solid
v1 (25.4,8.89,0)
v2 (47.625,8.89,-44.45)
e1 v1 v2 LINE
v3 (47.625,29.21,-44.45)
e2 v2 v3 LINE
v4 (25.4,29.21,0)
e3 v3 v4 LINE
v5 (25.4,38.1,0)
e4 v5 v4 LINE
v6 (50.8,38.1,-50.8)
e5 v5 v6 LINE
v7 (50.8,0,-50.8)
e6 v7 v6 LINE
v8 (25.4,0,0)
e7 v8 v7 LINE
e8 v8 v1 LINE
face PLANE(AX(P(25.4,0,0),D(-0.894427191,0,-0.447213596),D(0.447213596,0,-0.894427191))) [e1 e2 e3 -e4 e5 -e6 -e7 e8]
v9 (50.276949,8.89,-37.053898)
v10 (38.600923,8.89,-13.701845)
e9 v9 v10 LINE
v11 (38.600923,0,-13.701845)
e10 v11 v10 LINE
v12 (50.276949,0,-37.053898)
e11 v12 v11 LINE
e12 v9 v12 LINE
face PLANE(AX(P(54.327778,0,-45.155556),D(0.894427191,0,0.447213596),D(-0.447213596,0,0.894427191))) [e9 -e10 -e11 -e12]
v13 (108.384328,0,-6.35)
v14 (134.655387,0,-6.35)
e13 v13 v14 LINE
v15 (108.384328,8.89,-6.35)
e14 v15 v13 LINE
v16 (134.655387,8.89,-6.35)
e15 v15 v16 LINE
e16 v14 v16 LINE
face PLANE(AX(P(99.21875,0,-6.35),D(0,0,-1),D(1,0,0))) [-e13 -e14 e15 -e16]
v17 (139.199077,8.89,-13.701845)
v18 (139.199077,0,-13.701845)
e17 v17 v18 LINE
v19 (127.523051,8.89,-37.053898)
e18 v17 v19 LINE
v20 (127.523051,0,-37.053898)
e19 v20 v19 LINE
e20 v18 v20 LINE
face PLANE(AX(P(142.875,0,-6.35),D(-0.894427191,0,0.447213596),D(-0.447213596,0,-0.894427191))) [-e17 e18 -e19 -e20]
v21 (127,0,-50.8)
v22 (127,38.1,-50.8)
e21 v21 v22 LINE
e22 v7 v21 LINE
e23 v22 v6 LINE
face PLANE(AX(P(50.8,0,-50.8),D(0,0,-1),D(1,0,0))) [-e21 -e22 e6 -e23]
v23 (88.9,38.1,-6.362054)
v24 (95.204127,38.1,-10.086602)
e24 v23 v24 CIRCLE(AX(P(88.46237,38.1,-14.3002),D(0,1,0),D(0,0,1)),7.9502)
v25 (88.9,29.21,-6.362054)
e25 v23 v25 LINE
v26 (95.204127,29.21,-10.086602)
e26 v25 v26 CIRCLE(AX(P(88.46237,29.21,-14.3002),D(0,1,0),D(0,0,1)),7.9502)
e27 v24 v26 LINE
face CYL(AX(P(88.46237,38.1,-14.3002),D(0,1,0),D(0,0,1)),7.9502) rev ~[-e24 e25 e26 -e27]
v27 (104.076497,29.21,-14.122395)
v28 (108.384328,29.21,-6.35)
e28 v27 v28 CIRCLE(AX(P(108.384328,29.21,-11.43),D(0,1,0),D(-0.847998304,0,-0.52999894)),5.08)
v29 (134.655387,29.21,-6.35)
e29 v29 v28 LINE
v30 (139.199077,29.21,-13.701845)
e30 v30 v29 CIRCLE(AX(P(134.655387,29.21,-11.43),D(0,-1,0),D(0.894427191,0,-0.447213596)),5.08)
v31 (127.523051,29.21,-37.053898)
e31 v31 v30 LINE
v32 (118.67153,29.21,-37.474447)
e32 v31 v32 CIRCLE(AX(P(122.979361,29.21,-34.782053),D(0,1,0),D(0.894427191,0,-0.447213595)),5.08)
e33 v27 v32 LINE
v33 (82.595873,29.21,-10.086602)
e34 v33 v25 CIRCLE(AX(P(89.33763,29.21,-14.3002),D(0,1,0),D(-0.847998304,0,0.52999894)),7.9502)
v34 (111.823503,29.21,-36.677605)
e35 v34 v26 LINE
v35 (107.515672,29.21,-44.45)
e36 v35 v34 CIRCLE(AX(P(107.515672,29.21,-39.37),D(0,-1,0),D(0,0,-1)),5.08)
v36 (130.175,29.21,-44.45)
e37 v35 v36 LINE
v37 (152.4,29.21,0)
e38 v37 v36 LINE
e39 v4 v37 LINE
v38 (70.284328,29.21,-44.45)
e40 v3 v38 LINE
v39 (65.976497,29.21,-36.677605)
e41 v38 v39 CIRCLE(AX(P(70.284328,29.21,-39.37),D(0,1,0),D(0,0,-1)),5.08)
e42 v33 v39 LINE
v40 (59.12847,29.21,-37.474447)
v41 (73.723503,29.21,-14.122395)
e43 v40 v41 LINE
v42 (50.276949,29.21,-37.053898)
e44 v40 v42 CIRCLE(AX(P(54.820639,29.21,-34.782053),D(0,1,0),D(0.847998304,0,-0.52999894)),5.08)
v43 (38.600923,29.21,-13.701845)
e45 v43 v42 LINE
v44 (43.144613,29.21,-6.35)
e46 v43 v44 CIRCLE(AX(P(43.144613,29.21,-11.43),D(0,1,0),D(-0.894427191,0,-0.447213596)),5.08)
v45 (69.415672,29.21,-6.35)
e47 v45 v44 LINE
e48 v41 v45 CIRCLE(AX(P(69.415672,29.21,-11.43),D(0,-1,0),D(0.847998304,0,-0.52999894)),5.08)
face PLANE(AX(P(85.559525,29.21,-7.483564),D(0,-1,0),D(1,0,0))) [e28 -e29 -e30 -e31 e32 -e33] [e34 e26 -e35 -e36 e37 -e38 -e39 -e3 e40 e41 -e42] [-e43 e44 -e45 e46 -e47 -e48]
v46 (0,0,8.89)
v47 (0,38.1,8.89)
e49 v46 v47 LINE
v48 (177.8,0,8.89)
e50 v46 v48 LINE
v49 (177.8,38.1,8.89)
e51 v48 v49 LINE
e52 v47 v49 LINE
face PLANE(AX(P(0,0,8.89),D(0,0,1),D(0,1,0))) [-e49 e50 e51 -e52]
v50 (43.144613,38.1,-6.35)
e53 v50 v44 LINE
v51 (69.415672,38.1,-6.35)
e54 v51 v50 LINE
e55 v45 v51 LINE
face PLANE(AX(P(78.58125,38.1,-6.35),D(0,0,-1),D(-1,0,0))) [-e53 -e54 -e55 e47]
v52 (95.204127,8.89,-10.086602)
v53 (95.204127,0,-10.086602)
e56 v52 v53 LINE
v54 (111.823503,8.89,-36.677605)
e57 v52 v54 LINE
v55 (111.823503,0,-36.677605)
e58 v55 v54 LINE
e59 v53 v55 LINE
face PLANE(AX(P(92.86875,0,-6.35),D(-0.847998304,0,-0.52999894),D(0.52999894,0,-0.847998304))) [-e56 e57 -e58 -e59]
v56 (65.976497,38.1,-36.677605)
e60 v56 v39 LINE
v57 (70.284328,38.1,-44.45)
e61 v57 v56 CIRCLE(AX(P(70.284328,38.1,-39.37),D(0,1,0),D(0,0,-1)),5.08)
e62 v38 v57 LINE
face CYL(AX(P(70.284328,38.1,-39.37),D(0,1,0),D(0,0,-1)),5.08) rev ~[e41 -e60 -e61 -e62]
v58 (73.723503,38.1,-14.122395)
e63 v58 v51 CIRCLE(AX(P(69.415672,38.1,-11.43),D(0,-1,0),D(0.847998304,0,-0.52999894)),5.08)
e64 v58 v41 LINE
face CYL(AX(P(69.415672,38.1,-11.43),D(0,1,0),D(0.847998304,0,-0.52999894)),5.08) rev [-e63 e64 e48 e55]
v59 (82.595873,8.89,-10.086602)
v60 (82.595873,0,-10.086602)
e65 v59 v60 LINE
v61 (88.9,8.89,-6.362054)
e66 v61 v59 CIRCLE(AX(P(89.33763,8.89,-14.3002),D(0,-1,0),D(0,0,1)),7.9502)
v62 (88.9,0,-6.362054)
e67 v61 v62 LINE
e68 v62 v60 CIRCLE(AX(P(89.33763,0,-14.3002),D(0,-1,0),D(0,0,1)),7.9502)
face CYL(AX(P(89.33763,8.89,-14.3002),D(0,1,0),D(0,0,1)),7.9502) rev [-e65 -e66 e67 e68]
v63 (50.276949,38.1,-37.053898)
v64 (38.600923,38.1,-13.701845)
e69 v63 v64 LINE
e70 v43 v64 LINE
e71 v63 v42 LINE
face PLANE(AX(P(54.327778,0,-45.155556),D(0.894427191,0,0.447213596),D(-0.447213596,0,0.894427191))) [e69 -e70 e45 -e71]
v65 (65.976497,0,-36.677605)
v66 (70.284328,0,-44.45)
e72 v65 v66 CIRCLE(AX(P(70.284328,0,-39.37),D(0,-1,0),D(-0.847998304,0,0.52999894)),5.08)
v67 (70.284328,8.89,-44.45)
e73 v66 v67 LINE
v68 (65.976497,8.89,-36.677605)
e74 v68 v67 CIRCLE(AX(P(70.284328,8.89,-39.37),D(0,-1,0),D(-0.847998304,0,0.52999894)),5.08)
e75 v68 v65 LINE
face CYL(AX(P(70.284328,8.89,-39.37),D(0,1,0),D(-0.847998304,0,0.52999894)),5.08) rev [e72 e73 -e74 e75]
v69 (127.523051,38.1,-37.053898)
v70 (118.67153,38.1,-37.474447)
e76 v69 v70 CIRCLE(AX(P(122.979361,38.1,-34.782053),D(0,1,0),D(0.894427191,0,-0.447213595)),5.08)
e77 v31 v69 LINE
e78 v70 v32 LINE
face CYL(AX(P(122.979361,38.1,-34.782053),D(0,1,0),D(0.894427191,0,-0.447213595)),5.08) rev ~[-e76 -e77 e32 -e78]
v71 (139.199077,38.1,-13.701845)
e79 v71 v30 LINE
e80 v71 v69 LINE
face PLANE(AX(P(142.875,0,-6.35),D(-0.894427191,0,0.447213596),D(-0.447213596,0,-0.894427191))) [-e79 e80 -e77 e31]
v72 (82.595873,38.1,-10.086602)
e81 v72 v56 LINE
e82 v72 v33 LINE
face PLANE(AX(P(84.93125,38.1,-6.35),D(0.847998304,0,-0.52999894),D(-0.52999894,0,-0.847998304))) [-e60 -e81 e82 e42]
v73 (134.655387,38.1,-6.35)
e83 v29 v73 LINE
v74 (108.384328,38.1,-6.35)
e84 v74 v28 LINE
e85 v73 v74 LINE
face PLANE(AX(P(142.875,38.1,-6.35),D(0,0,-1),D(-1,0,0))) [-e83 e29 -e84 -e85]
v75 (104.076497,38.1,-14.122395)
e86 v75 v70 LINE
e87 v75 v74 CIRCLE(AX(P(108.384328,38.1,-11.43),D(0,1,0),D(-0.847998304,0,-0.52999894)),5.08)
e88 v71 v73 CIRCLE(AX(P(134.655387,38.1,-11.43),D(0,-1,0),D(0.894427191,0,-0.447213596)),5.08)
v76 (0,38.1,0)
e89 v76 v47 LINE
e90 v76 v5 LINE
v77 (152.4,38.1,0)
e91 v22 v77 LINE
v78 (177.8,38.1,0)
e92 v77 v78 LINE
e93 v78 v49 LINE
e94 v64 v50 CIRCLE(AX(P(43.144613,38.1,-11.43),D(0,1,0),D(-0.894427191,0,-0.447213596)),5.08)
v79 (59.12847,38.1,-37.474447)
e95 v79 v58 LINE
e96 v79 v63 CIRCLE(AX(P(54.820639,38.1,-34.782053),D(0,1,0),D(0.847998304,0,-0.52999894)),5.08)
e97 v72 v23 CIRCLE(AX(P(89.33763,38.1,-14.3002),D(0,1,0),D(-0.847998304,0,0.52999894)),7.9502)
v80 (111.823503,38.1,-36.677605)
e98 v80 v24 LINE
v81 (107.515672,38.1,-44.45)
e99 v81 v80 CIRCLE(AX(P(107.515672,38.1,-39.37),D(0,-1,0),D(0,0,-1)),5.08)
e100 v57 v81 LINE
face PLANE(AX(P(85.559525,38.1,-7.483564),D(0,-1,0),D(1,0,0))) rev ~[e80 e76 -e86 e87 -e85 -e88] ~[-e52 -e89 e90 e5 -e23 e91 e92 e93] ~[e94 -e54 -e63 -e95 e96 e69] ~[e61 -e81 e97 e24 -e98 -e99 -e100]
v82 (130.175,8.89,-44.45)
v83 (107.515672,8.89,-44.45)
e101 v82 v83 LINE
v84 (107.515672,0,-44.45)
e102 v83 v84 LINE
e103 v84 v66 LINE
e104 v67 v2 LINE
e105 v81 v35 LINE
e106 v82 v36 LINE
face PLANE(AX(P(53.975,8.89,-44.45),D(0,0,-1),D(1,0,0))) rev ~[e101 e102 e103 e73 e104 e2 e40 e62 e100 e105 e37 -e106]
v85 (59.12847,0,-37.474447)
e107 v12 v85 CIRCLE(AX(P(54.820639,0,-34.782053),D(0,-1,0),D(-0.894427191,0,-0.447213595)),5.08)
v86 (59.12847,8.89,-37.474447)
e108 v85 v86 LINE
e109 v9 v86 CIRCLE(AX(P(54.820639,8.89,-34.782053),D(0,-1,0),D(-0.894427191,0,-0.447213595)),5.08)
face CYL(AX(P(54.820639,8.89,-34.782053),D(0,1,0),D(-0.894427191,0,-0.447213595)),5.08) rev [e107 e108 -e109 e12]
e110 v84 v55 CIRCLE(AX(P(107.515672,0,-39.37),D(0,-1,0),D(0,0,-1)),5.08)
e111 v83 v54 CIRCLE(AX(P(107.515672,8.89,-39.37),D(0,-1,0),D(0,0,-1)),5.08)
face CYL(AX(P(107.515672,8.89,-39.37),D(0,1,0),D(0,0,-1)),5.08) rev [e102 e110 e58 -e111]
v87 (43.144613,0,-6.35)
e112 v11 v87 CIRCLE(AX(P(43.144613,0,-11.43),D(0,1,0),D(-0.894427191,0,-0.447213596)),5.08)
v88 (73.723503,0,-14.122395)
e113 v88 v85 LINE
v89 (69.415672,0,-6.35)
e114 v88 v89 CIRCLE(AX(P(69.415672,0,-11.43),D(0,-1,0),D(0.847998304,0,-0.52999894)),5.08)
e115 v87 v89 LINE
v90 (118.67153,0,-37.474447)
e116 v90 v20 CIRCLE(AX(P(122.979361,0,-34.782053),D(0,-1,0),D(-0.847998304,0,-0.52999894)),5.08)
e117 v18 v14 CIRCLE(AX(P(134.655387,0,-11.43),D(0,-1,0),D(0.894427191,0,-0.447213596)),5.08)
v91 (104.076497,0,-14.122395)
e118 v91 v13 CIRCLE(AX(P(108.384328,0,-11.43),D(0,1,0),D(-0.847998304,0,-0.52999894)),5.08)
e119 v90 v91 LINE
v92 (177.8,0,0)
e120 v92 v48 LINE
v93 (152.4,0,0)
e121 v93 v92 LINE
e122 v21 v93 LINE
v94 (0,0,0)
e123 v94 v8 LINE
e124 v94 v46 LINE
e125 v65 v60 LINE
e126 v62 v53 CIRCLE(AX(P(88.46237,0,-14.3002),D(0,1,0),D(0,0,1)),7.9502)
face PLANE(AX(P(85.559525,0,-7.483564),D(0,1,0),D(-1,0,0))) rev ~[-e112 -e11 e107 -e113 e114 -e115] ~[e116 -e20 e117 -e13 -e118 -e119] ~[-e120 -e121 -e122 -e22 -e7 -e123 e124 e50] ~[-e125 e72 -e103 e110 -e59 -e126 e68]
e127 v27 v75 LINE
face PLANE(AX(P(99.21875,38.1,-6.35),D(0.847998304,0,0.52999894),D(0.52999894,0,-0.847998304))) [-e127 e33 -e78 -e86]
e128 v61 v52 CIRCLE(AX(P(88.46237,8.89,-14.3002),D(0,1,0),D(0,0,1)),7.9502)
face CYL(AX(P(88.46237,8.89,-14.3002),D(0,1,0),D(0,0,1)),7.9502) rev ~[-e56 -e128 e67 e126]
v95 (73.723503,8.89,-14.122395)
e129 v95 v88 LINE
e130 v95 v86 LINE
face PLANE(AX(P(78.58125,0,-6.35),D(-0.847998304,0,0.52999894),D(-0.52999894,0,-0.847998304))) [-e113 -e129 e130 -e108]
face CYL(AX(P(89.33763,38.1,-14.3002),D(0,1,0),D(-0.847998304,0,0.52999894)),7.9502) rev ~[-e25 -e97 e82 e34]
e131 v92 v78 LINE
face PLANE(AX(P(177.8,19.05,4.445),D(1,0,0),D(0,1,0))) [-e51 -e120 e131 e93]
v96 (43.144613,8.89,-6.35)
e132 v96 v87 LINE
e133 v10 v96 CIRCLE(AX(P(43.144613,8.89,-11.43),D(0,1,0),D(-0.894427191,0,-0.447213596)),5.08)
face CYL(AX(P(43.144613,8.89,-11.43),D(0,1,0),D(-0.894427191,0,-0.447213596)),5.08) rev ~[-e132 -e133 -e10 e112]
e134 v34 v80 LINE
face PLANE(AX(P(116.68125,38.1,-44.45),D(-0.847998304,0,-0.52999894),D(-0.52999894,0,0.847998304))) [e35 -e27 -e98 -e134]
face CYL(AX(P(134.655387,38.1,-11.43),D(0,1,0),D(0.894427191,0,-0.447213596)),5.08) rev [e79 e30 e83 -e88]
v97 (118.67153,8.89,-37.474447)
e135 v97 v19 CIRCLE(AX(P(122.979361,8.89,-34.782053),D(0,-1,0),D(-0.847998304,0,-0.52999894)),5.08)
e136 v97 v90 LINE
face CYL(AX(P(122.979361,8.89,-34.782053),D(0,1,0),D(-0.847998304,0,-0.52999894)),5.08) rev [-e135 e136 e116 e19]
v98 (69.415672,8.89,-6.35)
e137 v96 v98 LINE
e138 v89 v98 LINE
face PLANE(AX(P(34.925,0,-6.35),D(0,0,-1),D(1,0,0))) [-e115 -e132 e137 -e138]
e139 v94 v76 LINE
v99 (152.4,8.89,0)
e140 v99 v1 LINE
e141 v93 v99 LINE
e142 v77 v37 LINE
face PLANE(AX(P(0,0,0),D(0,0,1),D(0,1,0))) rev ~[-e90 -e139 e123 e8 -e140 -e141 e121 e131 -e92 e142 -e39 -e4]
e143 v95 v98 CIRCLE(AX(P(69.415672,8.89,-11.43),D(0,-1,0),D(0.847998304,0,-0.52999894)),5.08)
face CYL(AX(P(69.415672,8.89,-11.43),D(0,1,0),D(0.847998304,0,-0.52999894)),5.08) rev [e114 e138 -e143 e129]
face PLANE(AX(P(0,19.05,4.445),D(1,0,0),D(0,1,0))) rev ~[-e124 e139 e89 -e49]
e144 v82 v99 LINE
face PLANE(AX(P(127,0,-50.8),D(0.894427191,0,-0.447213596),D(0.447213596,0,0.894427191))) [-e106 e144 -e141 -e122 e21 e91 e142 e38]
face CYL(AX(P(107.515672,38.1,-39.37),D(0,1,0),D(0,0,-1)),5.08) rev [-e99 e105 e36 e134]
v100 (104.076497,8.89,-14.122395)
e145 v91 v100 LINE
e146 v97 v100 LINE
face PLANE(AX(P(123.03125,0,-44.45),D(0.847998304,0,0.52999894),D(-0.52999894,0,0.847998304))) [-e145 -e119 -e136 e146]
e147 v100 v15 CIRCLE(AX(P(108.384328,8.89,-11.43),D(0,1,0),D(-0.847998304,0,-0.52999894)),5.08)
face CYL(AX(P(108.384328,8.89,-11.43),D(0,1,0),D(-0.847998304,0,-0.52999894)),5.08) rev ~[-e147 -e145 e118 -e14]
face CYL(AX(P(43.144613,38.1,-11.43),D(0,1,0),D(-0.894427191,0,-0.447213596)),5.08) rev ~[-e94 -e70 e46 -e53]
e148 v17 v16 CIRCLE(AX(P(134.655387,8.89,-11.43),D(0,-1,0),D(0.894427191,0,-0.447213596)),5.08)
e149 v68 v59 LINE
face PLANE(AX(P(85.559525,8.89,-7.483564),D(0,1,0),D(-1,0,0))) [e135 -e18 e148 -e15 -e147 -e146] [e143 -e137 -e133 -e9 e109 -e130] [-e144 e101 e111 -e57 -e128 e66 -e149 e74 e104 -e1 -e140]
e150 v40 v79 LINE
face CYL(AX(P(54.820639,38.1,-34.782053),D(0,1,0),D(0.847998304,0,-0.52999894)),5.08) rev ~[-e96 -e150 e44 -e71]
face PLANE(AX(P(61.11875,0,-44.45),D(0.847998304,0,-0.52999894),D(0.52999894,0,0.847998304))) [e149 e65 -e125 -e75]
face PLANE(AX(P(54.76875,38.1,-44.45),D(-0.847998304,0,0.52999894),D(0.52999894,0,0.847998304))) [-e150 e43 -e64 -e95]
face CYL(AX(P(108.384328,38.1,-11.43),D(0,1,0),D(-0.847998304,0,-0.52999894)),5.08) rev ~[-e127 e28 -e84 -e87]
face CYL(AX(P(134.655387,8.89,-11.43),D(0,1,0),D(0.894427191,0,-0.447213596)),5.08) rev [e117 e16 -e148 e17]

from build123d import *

# Parameters (mm, degrees)
F0_W          = 38.1
F0_H          = 8.89
F1_DEPTH      = 177.8
F3_DEPTH      = 8.89
F5_DEPTH      = 8.89
F7_DEPTH      = 38.1
F10_DEPTH     = 20.32
F12_DEPTH     = 20.32
F13_T1_DEPTH  = 8.89
F13_T3_DEPTH  = 8.89
F13_T8_DEPTH  = 31.5348218608
F13_T13_DEPTH = 31.5348218608
F13_T18_DEPTH = 31.5348218608
F13_T23_DEPTH = 31.8039450471
F13_T28_DEPTH = 29.4390316571
F13_T33_DEPTH = 31.5348218608
F13_T38_DEPTH = 29.4390316571
F13_T43_DEPTH = 31.8039450471
F13_T48_DEPTH = 31.8039450471
F13_T53_DEPTH = 29.4390316571
F13_T58_DEPTH = 31.8039450471
F13_T63_DEPTH = 29.4390316571
F13_T68_DEPTH = 31.8039450471
F13_T73_DEPTH = 31.8039450471
F13_T78_DEPTH = 31.8039450471
F13_T83_DEPTH = 31.8039450471
F14_T1_DEPTH  = 8.89
F14_T3_DEPTH  = 8.89


# Not quite as in the source:
# - a fillet or chamfer that OpenCascade refuses, or shapes differently, is made with other operations: its cross-section is extruded or revolved along the edge and cut away or added


with BuildPart() as f1:
    # F0 (on Right) → F1 (new body)
    with BuildSketch(Plane.YZ):
        with Locations((19.05, 4.445)):
            Rectangle(F0_W, F0_H)
    extrude(amount=F1_DEPTH)

    # F2 (on face) → F3 (join)
    with BuildSketch(Plane.XZ):
        Polygon((82.55, 0), (31.75, 0), (34.925, -6.35), (78.58125, -6.35), align=None)
        Polygon((88.9, 0), (82.55, 0), (78.58125, -6.35), (84.93125, -6.35), align=None)
        Polygon((92.86875, -6.35), (88.9, 0), (84.93125, -6.35), align=None)
        Polygon((95.25, 0), (88.9, 0), (92.86875, -6.35), (99.21875, -6.35), align=None)
        Polygon((146.05, 0), (95.25, 0), (99.21875, -6.35), (142.875, -6.35), align=None)
        Polygon((149.225, -6.35), (152.4, 0), (146.05, 0), (142.875, -6.35), align=None)
        Polygon((130.175, -44.45), (149.225, -6.35), (142.875, -6.35), (123.825, -44.45), align=None)
        Polygon((127, -50.8), (130.175, -44.45), (123.825, -44.45), (123.4722222222, -45.1555555556), align=None)
        Polygon((123.4722222222, -45.1555555556), (120.65, -50.8), (127, -50.8), align=None)
        Polygon((123.03125, -44.45), (116.68125, -44.45), (120.65, -50.8), (123.4722222222, -45.1555555556), align=None)
        Polygon((99.21875, -6.35), (92.86875, -6.35), (116.68125, -44.45), (123.03125, -44.45), align=None)
        Polygon((61.11875, -44.45), (57.15, -50.8), (88.9, -50.8), (120.65, -50.8), (116.68125, -44.45), align=None)
        Polygon((84.93125, -6.35), (78.58125, -6.35), (54.76875, -44.45), (61.11875, -44.45), align=None)
        Polygon((54.3277777778, -45.1555555556), (57.15, -50.8), (61.11875, -44.45), (54.76875, -44.45), align=None)
        Polygon((54.3277777778, -45.1555555556), (50.8, -50.8), (57.15, -50.8), align=None)
        Polygon((34.925, -6.35), (28.575, -6.35), (47.625, -44.45), (53.975, -44.45), align=None)
        Polygon((31.75, 0), (25.4, 0), (28.575, -6.35), (34.925, -6.35), align=None)
        Polygon((53.975, -44.45), (47.625, -44.45), (50.8, -50.8), (54.3277777778, -45.1555555556), align=None)
    extrude(amount=-F3_DEPTH)

    # F4 (on face) → F5 (join)
    with BuildSketch(Plane(origin=(0, 38.1, 0), x_dir=(-1, 0, 0), z_dir=(0, 1, 0))):
        Polygon((-95.25, 0), (-146.05, 0), (-142.875, -6.35), (-99.21875, -6.35), align=None)
        Polygon((-146.05, 0), (-152.4, 0), (-149.225, -6.35), (-142.875, -6.35), align=None)
        Polygon((-88.9, 0), (-95.25, 0), (-99.21875, -6.35), (-92.86875, -6.35), align=None)
        Polygon((-84.93125, -6.35), (-88.9, 0), (-92.86875, -6.35), align=None)
        Polygon((-82.55, 0), (-88.9, 0), (-84.93125, -6.35), (-78.58125, -6.35), align=None)
        Polygon((-31.75, 0), (-82.55, 0), (-78.58125, -6.35), (-34.925, -6.35), align=None)
        Polygon((-25.4, 0), (-31.75, 0), (-34.925, -6.35), (-28.575, -6.35), align=None)
        Polygon((-28.575, -6.35), (-34.925, -6.35), (-53.975, -44.45), (-47.625, -44.45), align=None)
        Polygon((-54.3277777778, -45.1555555556), (-50.8, -50.8), (-47.625, -44.45), (-53.975, -44.45), align=None)
        Polygon((-54.3277777778, -45.1555555556), (-57.15, -50.8), (-50.8, -50.8), align=None)
        Polygon((-61.11875, -44.45), (-57.15, -50.8), (-54.3277777778, -45.1555555556), (-54.76875, -44.45), align=None)
        Polygon((-78.58125, -6.35), (-84.93125, -6.35), (-61.11875, -44.45), (-54.76875, -44.45), align=None)
        Polygon((-116.68125, -44.45), (-120.65, -50.8), (-57.15, -50.8), (-61.11875, -44.45), align=None)
        Polygon((-92.86875, -6.35), (-99.21875, -6.35), (-123.03125, -44.45), (-116.68125, -44.45), align=None)
        Polygon((-123.4722222222, -45.1555555556), (-120.65, -50.8), (-116.68125, -44.45), (-123.03125, -44.45), align=None)
        Polygon((-123.4722222222, -45.1555555556), (-127, -50.8), (-120.65, -50.8), align=None)
        Polygon((-123.825, -44.45), (-130.175, -44.45), (-127, -50.8), (-123.4722222222, -45.1555555556), align=None)
        Polygon((-142.875, -6.35), (-149.225, -6.35), (-130.175, -44.45), (-123.825, -44.45), align=None)
    extrude(amount=-F5_DEPTH)

    # F6 (on face) → F7 (join)
    with BuildSketch(Plane.XZ):
        Polygon((53.975, -44.45), (47.625, -44.45), (50.8, -50.8), (127, -50.8), (130.175, -44.45), (123.825, -44.45), (123.4722222222, -45.1555555556), (123.03125, -44.45), (116.68125, -44.45), (61.11875, -44.45), (54.76875, -44.45), (54.3277777778, -45.1555555556), align=None)
    extrude(amount=-F7_DEPTH)

    # F9 (on offset) → F10 (join)
    with BuildSketch(Plane(origin=(0, 8.89, 0), x_dir=(-1, 0, 0), z_dir=(0, 1, 0))):
        Polygon((-123.825, -44.45), (-123.4722222222, -45.1555555556), (-123.03125, -44.45), align=None)
    extrude(amount=F10_DEPTH)

    # F11 (on offset) → F12 (join)
    with BuildSketch(Plane(origin=(0, 8.89, 0), x_dir=(-1, 0, 0), z_dir=(0, 1, 0))):
        Polygon((-54.76875, -44.45), (-54.3277777778, -45.1555555556), (-53.975, -44.45), align=None)
    extrude(amount=F12_DEPTH)

    # F13: fillet of radius 5.08 on 16 edges, made by hand

    # F13_s2 → F13_t1 (join)
    with BuildSketch(Plane.XZ.offset(-8.89)):
        with BuildLine():
            ThreePointArc((50.2769488963, -37.0538977925), (54.5795522828, -39.8563287528), (59.1284704109, -37.4744473426))
            Line((59.1284704109, -37.4744473426), (54.3277777778, -45.1555555556))
            Line((54.3277777778, -45.1555555556), (50.2769488963, -37.0538977925))
        make_face()
        with BuildLine():
            ThreePointArc((118.6715295891, -37.4744473426), (123.2204477172, -39.8563287528), (127.5230511037, -37.0538977925))
            Line((127.5230511037, -37.0538977925), (123.4722222222, -45.1555555556))
            Line((123.4722222222, -45.1555555556), (118.6715295891, -37.4744473426))
        make_face()
        with BuildLine():
            ThreePointArc((73.7235033655, -14.1223946152), (73.8588557859, -8.9673758554), (69.4156719811, -6.35))
            Line((69.4156719811, -6.35), (78.58125, -6.35))
            Line((78.58125, -6.35), (73.7235033655, -14.1223946152))
        make_face()
        with BuildLine():
            ThreePointArc((38.6009225326, -13.7018450651), (38.8233065564, -8.7592859504), (43.1446126628, -6.35))
            Line((43.1446126628, -6.35), (34.925, -6.35))
            Line((34.925, -6.35), (38.6009225326, -13.7018450651))
        make_face()
        with BuildLine():
            ThreePointArc((104.0764966345, -14.1223946152), (103.9411442141, -8.9673758554), (108.3843280189, -6.35))
            Line((108.3843280189, -6.35), (99.21875, -6.35))
            Line((99.21875, -6.35), (104.0764966345, -14.1223946152))
        make_face()
        with BuildLine():
            ThreePointArc((139.1990774674, -13.7018450651), (138.9766934436, -8.7592859504), (134.6553873372, -6.35))
            Line((134.6553873372, -6.35), (142.875, -6.35))
            Line((142.875, -6.35), (139.1990774674, -13.7018450651))
        make_face()
        with BuildLine():
            ThreePointArc((65.9764966345, -36.6776053848), (65.8411442141, -41.8326241446), (70.2843280189, -44.45))
            Line((70.2843280189, -44.45), (61.11875, -44.45))
            Line((61.11875, -44.45), (65.9764966345, -36.6776053848))
        make_face()
        with BuildLine():
            ThreePointArc((107.5156719811, -44.45), (111.9588557859, -41.8326241446), (111.8235033655, -36.6776053848))
            Line((111.8235033655, -36.6776053848), (116.68125, -44.45))
            Line((116.68125, -44.45), (107.5156719811, -44.45))
        make_face()
    extrude(amount=F13_T1_DEPTH)

    # F13_s4 → F13_t3 (join)
    with BuildSketch(Plane.XZ.offset(-38.1)):
        with BuildLine():
            ThreePointArc((127.5230511037, -37.0538977925), (123.2204477172, -39.8563287528), (118.6715295891, -37.4744473426))
            Line((118.6715295891, -37.4744473426), (123.4722222222, -45.1555555556))
            Line((123.4722222222, -45.1555555556), (127.5230511037, -37.0538977925))
        make_face()
        with BuildLine():
            ThreePointArc((104.0764966345, -14.1223946152), (103.9411442141, -8.9673758554), (108.3843280189, -6.35))
            Line((108.3843280189, -6.35), (99.21875, -6.35))
            Line((99.21875, -6.35), (104.0764966345, -14.1223946152))
        make_face()
        with BuildLine():
            ThreePointArc((38.6009225326, -13.7018450651), (38.8233065564, -8.7592859504), (43.1446126628, -6.35))
            Line((43.1446126628, -6.35), (34.925, -6.35))
            Line((34.925, -6.35), (38.6009225326, -13.7018450651))
        make_face()
        with BuildLine():
            ThreePointArc((59.1284704109, -37.4744473426), (54.5795522828, -39.8563287528), (50.2769488963, -37.0538977925))
            Line((50.2769488963, -37.0538977925), (54.3277777778, -45.1555555556))
            Line((54.3277777778, -45.1555555556), (59.1284704109, -37.4744473426))
        make_face()
        with BuildLine():
            ThreePointArc((139.1990774674, -13.7018450651), (138.9766934436, -8.7592859504), (134.6553873372, -6.35))
            Line((134.6553873372, -6.35), (142.875, -6.35))
            Line((142.875, -6.35), (139.1990774674, -13.7018450651))
        make_face()
        with BuildLine():
            ThreePointArc((73.7235033655, -14.1223946152), (73.8588557859, -8.9673758554), (69.4156719811, -6.35))
            Line((69.4156719811, -6.35), (78.58125, -6.35))
            Line((78.58125, -6.35), (73.7235033655, -14.1223946152))
        make_face()
        with BuildLine():
            ThreePointArc((107.5156719811, -44.45), (111.9588557859, -41.8326241446), (111.8235033655, -36.6776053848))
            Line((111.8235033655, -36.6776053848), (116.68125, -44.45))
            Line((116.68125, -44.45), (107.5156719811, -44.45))
        make_face()
        with BuildLine():
            ThreePointArc((70.2843280189, -44.45), (65.8411442141, -41.8326241446), (65.9764966345, -36.6776053848))
            Line((65.9764966345, -36.6776053848), (61.11875, -44.45))
            Line((61.11875, -44.45), (70.2843280189, -44.45))
        make_face()
    extrude(amount=F13_T3_DEPTH)


with BuildPart() as f13_tool6:
    # F13_s7 → F13_t8 (new body)
    with BuildSketch(Plane.XZ):
        with BuildLine():
            ThreePointArc((50.2769488963, -37.0538977925), (54.5795522828, -39.8563287528), (59.1284704109, -37.4744473426))
            Line((59.1284704109, -37.4744473426), (54.3277777778, -45.1555555556))
            Line((54.3277777778, -45.1555555556), (50.2769488963, -37.0538977925))
        make_face()
    extrude(amount=-F13_T8_DEPTH)

    split(bisect_by=Plane.XZ.offset(-29.21), keep=Keep.BOTTOM)


with BuildPart() as f1_1:
    add(f1.part)

    # F13_t5: union F13_tool6
    add(f13_tool6.part)


with BuildPart() as f13_tool11:
    # F13_s12 → F13_t13 (new body)
    with BuildSketch(Plane.XZ):
        with BuildLine():
            ThreePointArc((118.6715295891, -37.4744473426), (123.2204477172, -39.8563287528), (127.5230511037, -37.0538977925))
            Line((127.5230511037, -37.0538977925), (123.4722222222, -45.1555555556))
            Line((123.4722222222, -45.1555555556), (118.6715295891, -37.4744473426))
        make_face()
    extrude(amount=-F13_T13_DEPTH)

    split(bisect_by=Plane.XZ.offset(-29.21), keep=Keep.BOTTOM)


with BuildPart() as f1_2:
    add(f1_1.part)

    # F13_t10: union F13_tool11
    add(f13_tool11.part)


with BuildPart() as f13_tool16:
    # F13_s17 → F13_t18 (new body)
    with BuildSketch(Plane.XZ.offset(-6.5651781392)):
        with BuildLine():
            ThreePointArc((127.5230511037, -37.0538977925), (123.2204477172, -39.8563287528), (118.6715295891, -37.4744473426))
            Line((118.6715295891, -37.4744473426), (123.4722222222, -45.1555555556))
            Line((123.4722222222, -45.1555555556), (127.5230511037, -37.0538977925))
        make_face()
    extrude(amount=-F13_T18_DEPTH)

    split(bisect_by=Plane.XZ.offset(-8.89), keep=Keep.TOP)


with BuildPart() as f1_3:
    add(f1_2.part)

    # F13_t15: union F13_tool16
    add(f13_tool16.part)


with BuildPart() as f13_tool21:
    # F13_s22 → F13_t23 (new body)
    with BuildSketch(Plane.XZ.offset(-38.1)):
        with BuildLine():
            ThreePointArc((104.0764966345, -14.1223946152), (103.9411442141, -8.9673758554), (108.3843280189, -6.35))
            Line((108.3843280189, -6.35), (99.21875, -6.35))
            Line((99.21875, -6.35), (104.0764966345, -14.1223946152))
        make_face()
    extrude(amount=F13_T23_DEPTH)

    split(bisect_by=Plane.XZ.offset(-8.89), keep=Keep.TOP)


with BuildPart() as f1_4:
    add(f1_3.part)

    # F13_t20: union F13_tool21
    add(f13_tool21.part)


with BuildPart() as f13_tool26:
    # F13_s27 → F13_t28 (new body)
    with BuildSketch(Plane.XZ.offset(-38.1)):
        with BuildLine():
            ThreePointArc((38.6009225326, -13.7018450651), (38.8233065564, -8.7592859504), (43.1446126628, -6.35))
            Line((43.1446126628, -6.35), (34.925, -6.35))
            Line((34.925, -6.35), (38.6009225326, -13.7018450651))
        make_face()
    extrude(amount=F13_T28_DEPTH)

    split(bisect_by=Plane.XZ.offset(-8.89), keep=Keep.TOP)


with BuildPart() as f1_5:
    add(f1_4.part)

    # F13_t25: union F13_tool26
    add(f13_tool26.part)


with BuildPart() as f13_tool31:
    # F13_s32 → F13_t33 (new body)
    with BuildSketch(Plane.XZ.offset(-6.5651781392)):
        with BuildLine():
            ThreePointArc((59.1284704109, -37.4744473426), (54.5795522828, -39.8563287528), (50.2769488963, -37.0538977925))
            Line((50.2769488963, -37.0538977925), (54.3277777778, -45.1555555556))
            Line((54.3277777778, -45.1555555556), (59.1284704109, -37.4744473426))
        make_face()
    extrude(amount=-F13_T33_DEPTH)

    split(bisect_by=Plane.XZ.offset(-8.89), keep=Keep.TOP)


with BuildPart() as f1_6:
    add(f1_5.part)

    # F13_t30: union F13_tool31
    add(f13_tool31.part)


with BuildPart() as f13_tool36:
    # F13_s37 → F13_t38 (new body)
    with BuildSketch(Plane.XZ.offset(-38.1)):
        with BuildLine():
            ThreePointArc((139.1990774674, -13.7018450651), (138.9766934436, -8.7592859504), (134.6553873372, -6.35))
            Line((134.6553873372, -6.35), (142.875, -6.35))
            Line((142.875, -6.35), (139.1990774674, -13.7018450651))
        make_face()
    extrude(amount=F13_T38_DEPTH)

    split(bisect_by=Plane.XZ.offset(-8.89), keep=Keep.TOP)


with BuildPart() as f1_7:
    add(f1_6.part)

    # F13_t35: union F13_tool36
    add(f13_tool36.part)


with BuildPart() as f13_tool41:
    # F13_s42 → F13_t43 (new body)
    with BuildSketch(Plane.XZ.offset(-38.1)):
        with BuildLine():
            ThreePointArc((73.7235033655, -14.1223946152), (73.8588557859, -8.9673758554), (69.4156719811, -6.35))
            Line((69.4156719811, -6.35), (78.58125, -6.35))
            Line((78.58125, -6.35), (73.7235033655, -14.1223946152))
        make_face()
    extrude(amount=F13_T43_DEPTH)

    split(bisect_by=Plane.XZ.offset(-8.89), keep=Keep.TOP)


with BuildPart() as f1_8:
    add(f1_7.part)

    # F13_t40: union F13_tool41
    add(f13_tool41.part)


with BuildPart() as f13_tool46:
    # F13_s47 → F13_t48 (new body)
    with BuildSketch(Plane.XZ):
        with BuildLine():
            ThreePointArc((73.7235033655, -14.1223946152), (73.8588557859, -8.9673758554), (69.4156719811, -6.35))
            Line((69.4156719811, -6.35), (78.58125, -6.35))
            Line((78.58125, -6.35), (73.7235033655, -14.1223946152))
        make_face()
    extrude(amount=-F13_T48_DEPTH)

    split(bisect_by=Plane.XZ.offset(-29.21), keep=Keep.BOTTOM)


with BuildPart() as f1_9:
    add(f1_8.part)

    # F13_t45: union F13_tool46
    add(f13_tool46.part)


with BuildPart() as f13_tool51:
    # F13_s52 → F13_t53 (new body)
    with BuildSketch(Plane.XZ):
        with BuildLine():
            ThreePointArc((38.6009225326, -13.7018450651), (38.8233065564, -8.7592859504), (43.1446126628, -6.35))
            Line((43.1446126628, -6.35), (34.925, -6.35))
            Line((34.925, -6.35), (38.6009225326, -13.7018450651))
        make_face()
    extrude(amount=-F13_T53_DEPTH)

    split(bisect_by=Plane.XZ.offset(-29.21), keep=Keep.BOTTOM)


with BuildPart() as f1_10:
    add(f1_9.part)

    # F13_t50: union F13_tool51
    add(f13_tool51.part)


with BuildPart() as f13_tool56:
    # F13_s57 → F13_t58 (new body)
    with BuildSketch(Plane.XZ):
        with BuildLine():
            ThreePointArc((104.0764966345, -14.1223946152), (103.9411442141, -8.9673758554), (108.3843280189, -6.35))
            Line((108.3843280189, -6.35), (99.21875, -6.35))
            Line((99.21875, -6.35), (104.0764966345, -14.1223946152))
        make_face()
    extrude(amount=-F13_T58_DEPTH)

    split(bisect_by=Plane.XZ.offset(-29.21), keep=Keep.BOTTOM)


with BuildPart() as f1_11:
    add(f1_10.part)

    # F13_t55: union F13_tool56
    add(f13_tool56.part)


with BuildPart() as f13_tool61:
    # F13_s62 → F13_t63 (new body)
    with BuildSketch(Plane.XZ):
        with BuildLine():
            ThreePointArc((139.1990774674, -13.7018450651), (138.9766934436, -8.7592859504), (134.6553873372, -6.35))
            Line((134.6553873372, -6.35), (142.875, -6.35))
            Line((142.875, -6.35), (139.1990774674, -13.7018450651))
        make_face()
    extrude(amount=-F13_T63_DEPTH)

    split(bisect_by=Plane.XZ.offset(-29.21), keep=Keep.BOTTOM)


with BuildPart() as f1_12:
    add(f1_11.part)

    # F13_t60: union F13_tool61
    add(f13_tool61.part)


with BuildPart() as f13_tool66:
    # F13_s67 → F13_t68 (new body)
    with BuildSketch(Plane.XZ):
        with BuildLine():
            ThreePointArc((65.9764966345, -36.6776053848), (65.8411442141, -41.8326241446), (70.2843280189, -44.45))
            Line((70.2843280189, -44.45), (61.11875, -44.45))
            Line((61.11875, -44.45), (65.9764966345, -36.6776053848))
        make_face()
    extrude(amount=-F13_T68_DEPTH)

    split(bisect_by=Plane.XZ.offset(-29.21), keep=Keep.BOTTOM)


with BuildPart() as f1_13:
    add(f1_12.part)

    # F13_t65: union F13_tool66
    add(f13_tool66.part)


with BuildPart() as f13_tool71:
    # F13_s72 → F13_t73 (new body)
    with BuildSketch(Plane.XZ):
        with BuildLine():
            ThreePointArc((107.5156719811, -44.45), (111.9588557859, -41.8326241446), (111.8235033655, -36.6776053848))
            Line((111.8235033655, -36.6776053848), (116.68125, -44.45))
            Line((116.68125, -44.45), (107.5156719811, -44.45))
        make_face()
    extrude(amount=-F13_T73_DEPTH)

    split(bisect_by=Plane.XZ.offset(-29.21), keep=Keep.BOTTOM)


with BuildPart() as f1_14:
    add(f1_13.part)

    # F13_t70: union F13_tool71
    add(f13_tool71.part)


with BuildPart() as f13_tool76:
    # F13_s77 → F13_t78 (new body)
    with BuildSketch(Plane.XZ.offset(-38.1)):
        with BuildLine():
            ThreePointArc((107.5156719811, -44.45), (111.9588557859, -41.8326241446), (111.8235033655, -36.6776053848))
            Line((111.8235033655, -36.6776053848), (116.68125, -44.45))
            Line((116.68125, -44.45), (107.5156719811, -44.45))
        make_face()
    extrude(amount=F13_T78_DEPTH)

    split(bisect_by=Plane.XZ.offset(-8.89), keep=Keep.TOP)


with BuildPart() as f1_15:
    add(f1_14.part)

    # F13_t75: union F13_tool76
    add(f13_tool76.part)


with BuildPart() as f13_tool81:
    # F13_s82 → F13_t83 (new body)
    with BuildSketch(Plane.XZ.offset(-38.1)):
        with BuildLine():
            ThreePointArc((70.2843280189, -44.45), (65.8411442141, -41.8326241446), (65.9764966345, -36.6776053848))
            Line((65.9764966345, -36.6776053848), (61.11875, -44.45))
            Line((61.11875, -44.45), (70.2843280189, -44.45))
        make_face()
    extrude(amount=F13_T83_DEPTH)

    split(bisect_by=Plane.XZ.offset(-8.89), keep=Keep.TOP)


with BuildPart() as f1_16:
    add(f1_15.part)

    # F13_t80: union F13_tool81
    add(f13_tool81.part)

    # F14: fillet of radius 7.9502 on 4 edges, made by hand

    # F14_s2 → F14_t1 (join)
    with BuildSketch(Plane.XZ.offset(-8.89)):
        with BuildLine():
            ThreePointArc((89.3376295995, -6.35), (85.4836228133, -7.3466173456), (82.595873483, -10.0866024272))
            Line((82.595873483, -10.0866024272), (84.93125, -6.35))
            Line((84.93125, -6.35), (89.3376295995, -6.35))
        make_face()
        with BuildLine():
            ThreePointArc((88.4623704005, -6.35), (92.3163771867, -7.3466173456), (95.204126517, -10.0866024272))
            Line((95.204126517, -10.0866024272), (92.86875, -6.35))
            Line((92.86875, -6.35), (88.4623704005, -6.35))
        make_face()
    extrude(amount=F14_T1_DEPTH)

    # F14_s4 → F14_t3 (join)
    with BuildSketch(Plane.XZ.offset(-38.1)):
        with BuildLine():
            ThreePointArc((82.595873483, -10.0866024272), (85.4836228133, -7.3466173456), (89.3376295995, -6.35))
            Line((89.3376295995, -6.35), (84.93125, -6.35))
            Line((84.93125, -6.35), (82.595873483, -10.0866024272))
        make_face()
        with BuildLine():
            ThreePointArc((88.4623704005, -6.35), (92.3163771867, -7.3466173456), (95.204126517, -10.0866024272))
            Line((95.204126517, -10.0866024272), (92.86875, -6.35))
            Line((92.86875, -6.35), (88.4623704005, -6.35))
        make_face()
    extrude(amount=F14_T3_DEPTH)


solid = f1_16.part
